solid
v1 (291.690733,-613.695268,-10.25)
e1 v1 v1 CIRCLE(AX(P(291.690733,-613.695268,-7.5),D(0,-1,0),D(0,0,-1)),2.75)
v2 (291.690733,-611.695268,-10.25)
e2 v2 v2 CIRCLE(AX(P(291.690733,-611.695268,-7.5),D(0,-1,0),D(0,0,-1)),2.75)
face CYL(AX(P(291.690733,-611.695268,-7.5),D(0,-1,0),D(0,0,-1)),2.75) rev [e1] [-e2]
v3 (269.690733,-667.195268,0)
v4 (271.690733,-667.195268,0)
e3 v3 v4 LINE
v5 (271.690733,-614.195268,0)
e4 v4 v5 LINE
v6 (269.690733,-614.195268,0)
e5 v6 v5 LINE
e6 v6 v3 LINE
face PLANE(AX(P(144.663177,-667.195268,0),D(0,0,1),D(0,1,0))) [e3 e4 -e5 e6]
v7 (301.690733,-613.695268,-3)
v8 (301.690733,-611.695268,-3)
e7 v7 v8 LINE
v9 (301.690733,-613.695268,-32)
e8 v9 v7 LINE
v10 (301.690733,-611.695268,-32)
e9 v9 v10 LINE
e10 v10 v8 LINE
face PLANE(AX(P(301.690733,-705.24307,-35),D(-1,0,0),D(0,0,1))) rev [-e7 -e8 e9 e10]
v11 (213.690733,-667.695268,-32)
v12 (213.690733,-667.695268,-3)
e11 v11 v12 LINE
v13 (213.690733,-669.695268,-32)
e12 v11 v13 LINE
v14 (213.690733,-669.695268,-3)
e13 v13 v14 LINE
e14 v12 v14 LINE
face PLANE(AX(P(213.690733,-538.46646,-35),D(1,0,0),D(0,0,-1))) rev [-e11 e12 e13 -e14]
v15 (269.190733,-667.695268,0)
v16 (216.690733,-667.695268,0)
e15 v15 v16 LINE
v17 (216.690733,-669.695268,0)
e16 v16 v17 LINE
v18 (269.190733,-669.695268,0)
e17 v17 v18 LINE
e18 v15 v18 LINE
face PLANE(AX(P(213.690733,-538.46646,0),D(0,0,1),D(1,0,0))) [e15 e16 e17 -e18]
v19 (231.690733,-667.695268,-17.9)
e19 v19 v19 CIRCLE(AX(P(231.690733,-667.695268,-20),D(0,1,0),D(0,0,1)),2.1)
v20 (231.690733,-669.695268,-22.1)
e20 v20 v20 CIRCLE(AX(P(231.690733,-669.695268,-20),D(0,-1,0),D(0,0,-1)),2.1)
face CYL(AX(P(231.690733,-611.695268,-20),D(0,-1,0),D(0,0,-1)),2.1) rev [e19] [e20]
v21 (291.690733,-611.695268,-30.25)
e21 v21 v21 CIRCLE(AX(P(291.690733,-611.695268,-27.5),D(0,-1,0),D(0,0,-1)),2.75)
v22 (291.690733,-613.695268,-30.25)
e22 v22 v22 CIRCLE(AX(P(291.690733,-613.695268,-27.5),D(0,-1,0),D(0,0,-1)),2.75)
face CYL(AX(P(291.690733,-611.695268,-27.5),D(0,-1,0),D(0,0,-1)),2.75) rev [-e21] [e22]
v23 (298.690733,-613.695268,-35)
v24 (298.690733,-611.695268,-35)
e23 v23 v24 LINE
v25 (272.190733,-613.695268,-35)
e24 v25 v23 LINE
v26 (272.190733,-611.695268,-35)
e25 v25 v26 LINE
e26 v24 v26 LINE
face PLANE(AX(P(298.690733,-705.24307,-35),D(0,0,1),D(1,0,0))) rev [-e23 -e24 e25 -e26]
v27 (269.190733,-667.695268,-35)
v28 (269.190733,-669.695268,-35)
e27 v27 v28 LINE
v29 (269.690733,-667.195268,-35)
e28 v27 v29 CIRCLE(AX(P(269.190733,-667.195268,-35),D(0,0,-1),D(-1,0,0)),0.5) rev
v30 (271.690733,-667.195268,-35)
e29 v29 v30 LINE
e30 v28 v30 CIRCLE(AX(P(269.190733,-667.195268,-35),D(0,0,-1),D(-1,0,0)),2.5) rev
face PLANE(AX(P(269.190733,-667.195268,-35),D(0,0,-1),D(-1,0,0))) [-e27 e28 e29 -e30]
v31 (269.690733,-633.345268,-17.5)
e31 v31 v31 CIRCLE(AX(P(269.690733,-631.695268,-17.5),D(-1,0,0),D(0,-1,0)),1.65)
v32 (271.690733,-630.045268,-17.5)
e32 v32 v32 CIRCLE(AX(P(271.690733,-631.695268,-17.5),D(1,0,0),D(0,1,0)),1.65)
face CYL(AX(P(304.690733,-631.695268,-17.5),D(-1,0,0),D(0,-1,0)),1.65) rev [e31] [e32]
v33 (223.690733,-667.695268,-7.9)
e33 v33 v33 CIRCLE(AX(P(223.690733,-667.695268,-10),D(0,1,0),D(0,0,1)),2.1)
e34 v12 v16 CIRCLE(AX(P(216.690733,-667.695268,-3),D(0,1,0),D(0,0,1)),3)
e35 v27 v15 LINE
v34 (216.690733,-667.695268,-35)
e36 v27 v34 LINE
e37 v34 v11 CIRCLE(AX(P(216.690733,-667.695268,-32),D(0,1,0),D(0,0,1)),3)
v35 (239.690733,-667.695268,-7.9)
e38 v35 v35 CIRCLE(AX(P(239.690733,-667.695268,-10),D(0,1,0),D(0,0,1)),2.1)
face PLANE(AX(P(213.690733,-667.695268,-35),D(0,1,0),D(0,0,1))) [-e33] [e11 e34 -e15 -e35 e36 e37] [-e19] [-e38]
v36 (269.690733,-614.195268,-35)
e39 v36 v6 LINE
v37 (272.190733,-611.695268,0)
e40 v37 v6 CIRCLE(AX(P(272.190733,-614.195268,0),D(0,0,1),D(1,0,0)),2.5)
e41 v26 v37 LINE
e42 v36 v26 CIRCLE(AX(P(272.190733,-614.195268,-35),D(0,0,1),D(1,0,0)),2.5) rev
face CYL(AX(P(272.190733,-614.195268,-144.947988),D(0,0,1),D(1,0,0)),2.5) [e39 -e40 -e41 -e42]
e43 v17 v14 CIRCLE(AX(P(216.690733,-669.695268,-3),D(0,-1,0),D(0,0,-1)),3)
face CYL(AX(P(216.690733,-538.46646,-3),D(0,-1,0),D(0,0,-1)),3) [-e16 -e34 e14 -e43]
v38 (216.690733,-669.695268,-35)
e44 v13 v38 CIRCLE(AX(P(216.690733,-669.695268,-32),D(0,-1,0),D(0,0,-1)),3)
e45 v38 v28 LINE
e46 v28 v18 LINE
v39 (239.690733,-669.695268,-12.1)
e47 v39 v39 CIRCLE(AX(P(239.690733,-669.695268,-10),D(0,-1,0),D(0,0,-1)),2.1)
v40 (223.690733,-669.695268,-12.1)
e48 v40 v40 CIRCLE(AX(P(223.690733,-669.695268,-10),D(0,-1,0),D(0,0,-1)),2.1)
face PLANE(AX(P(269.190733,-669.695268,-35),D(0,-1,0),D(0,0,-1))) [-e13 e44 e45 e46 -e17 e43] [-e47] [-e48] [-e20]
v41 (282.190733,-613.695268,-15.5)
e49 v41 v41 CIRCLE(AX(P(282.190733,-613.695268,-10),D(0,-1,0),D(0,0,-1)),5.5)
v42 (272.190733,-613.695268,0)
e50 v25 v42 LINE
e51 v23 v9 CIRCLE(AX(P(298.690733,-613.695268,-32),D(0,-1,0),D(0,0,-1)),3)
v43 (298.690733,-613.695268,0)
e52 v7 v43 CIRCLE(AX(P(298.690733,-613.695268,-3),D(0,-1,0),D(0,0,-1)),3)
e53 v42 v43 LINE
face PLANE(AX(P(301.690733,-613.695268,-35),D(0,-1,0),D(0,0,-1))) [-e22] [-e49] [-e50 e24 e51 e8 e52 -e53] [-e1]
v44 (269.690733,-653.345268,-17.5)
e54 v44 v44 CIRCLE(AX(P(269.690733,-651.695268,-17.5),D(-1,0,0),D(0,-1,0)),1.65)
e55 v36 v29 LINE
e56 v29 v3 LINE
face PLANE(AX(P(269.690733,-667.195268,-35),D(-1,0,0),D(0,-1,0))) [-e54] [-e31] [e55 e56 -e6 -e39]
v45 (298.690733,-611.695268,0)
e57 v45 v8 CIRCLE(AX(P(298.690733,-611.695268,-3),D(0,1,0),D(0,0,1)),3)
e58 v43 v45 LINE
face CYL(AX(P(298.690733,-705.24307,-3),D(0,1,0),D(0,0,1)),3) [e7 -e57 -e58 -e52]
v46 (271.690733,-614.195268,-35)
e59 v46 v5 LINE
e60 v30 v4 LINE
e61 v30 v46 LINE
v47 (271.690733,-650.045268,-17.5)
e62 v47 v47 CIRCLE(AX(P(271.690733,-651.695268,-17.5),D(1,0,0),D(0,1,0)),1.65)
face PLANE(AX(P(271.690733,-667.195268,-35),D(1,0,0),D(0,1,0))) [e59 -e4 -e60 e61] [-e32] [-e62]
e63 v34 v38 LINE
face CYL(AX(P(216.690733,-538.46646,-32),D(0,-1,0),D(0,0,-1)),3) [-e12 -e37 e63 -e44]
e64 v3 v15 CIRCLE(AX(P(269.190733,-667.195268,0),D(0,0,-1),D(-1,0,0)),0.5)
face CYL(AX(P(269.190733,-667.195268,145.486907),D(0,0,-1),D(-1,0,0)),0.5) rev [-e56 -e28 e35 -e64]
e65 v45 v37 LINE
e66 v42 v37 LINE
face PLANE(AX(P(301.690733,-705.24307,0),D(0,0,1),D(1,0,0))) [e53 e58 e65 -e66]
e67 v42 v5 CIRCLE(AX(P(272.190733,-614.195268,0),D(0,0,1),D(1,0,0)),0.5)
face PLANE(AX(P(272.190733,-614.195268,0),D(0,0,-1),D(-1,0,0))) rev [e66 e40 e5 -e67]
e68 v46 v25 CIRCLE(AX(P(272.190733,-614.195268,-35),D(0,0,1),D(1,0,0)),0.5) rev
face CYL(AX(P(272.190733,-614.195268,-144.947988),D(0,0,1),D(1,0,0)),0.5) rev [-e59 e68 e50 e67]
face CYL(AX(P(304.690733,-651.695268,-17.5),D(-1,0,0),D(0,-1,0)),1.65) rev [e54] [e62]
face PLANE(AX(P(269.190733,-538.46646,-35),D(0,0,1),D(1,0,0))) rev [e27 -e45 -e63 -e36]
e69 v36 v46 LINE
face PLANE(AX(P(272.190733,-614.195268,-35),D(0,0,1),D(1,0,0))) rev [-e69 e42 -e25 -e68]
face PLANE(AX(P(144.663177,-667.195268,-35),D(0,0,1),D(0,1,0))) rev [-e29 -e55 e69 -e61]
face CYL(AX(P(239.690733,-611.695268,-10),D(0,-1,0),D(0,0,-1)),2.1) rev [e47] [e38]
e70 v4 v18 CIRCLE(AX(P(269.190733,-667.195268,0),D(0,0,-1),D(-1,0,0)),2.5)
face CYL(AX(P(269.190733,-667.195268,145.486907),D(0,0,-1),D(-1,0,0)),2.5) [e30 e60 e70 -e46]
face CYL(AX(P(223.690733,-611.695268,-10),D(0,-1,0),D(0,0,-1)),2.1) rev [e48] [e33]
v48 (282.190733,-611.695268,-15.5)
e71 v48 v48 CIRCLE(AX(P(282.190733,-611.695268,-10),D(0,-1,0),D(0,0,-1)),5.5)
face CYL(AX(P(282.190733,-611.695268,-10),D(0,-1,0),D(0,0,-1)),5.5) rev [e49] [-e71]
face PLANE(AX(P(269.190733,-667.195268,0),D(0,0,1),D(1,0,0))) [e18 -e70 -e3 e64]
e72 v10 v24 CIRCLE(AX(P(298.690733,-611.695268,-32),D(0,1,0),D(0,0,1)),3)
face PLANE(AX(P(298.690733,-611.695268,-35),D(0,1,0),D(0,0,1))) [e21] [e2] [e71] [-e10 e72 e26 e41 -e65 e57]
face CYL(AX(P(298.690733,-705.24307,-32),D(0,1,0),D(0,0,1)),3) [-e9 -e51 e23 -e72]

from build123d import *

# Parameters (mm, degrees)
EXTRUDE_1_DEPTH               = 35
FILLET_1_R                    = 3
CUT_EXTRUDE_2_DEPTH           = 310.2026821
CUT_EXTRUDE_2_DEPTH_BACK      = 310.2026821
SKETCH_5_R                    = 2.1
SKETCH_5_R_2                  = 5.5
SKETCH_5_R_3                  = 2.75
SKETCH_6_R                    = 1.65
CUT_EXTRUDE_3_DEPTH           = 35
SHEET_START                   = -667.695268107
SHEET_METAL_1_OUTLINE_R       = 2.75
SHEET_METAL_1_OUTLINE_R_2     = 5.5
SHEET_METAL_1_DEPTH           = 56
SHEET_START_2                 = -669.695268107
SHEET_METAL_1_2_OUTLINE_R     = 1.65
SHEET_METAL_1_2_OUTLINE_R_2   = 2.75
SHEET_METAL_1_2_OUTLINE_R_3   = 5.5
SHEET_METAL_1_2_DEPTH         = 2
SHEET_METAL_1_3_OUTLINE_R     = 1.65
SHEET_METAL_1_3_OUTLINE_R_2   = 2.75
SHEET_METAL_1_3_OUTLINE_R_3   = 5.5
SHEET_METAL_1_3_DEPTH         = 2
SHEET_START_3                 = -650.045268007
SHEET_METAL_1_3_2_OUTLINE_W   = 2
SHEET_METAL_1_3_2_OUTLINE_H   = 35
SHEET_METAL_1_3_2_DEPTH       = 16.6999998
SHEET_START_4                 = -630.045268007
SHEET_METAL_1_3_3_OUTLINE_W   = 2
SHEET_METAL_1_3_3_OUTLINE_H   = 35
SHEET_METAL_1_3_3_DEPTH       = 15.8499999
SHEET_START_5                 = -667.459318107
SHEET_METAL_1_3_4_OUTLINE_W   = 2
SHEET_METAL_1_3_4_OUTLINE_H   = 35
SHEET_METAL_1_3_4_DEPTH       = 14.1140499
SHEET_START_6                 = -613.695268107
SHEET_METAL_1_3_5_OUTLINE_R   = 1.65
SHEET_METAL_1_3_5_DEPTH       = 2
SHEET_START_7                 = -614.195268107
SHEET_METAL_1_3_6_OUTLINE_R   = 5.5
SHEET_METAL_1_3_6_OUTLINE_R_2 = 2.75
SHEET_METAL_1_3_6_OUTLINE_R_3 = 1.65
SHEET_METAL_1_3_6_DEPTH       = 2.5
SHEET_START_8                 = -653.345268207
SHEET_METAL_1_3_7_OUTLINE_W   = 2
SHEET_METAL_1_3_7_OUTLINE_H   = 35
SHEET_METAL_1_3_7_DEPTH       = 23.3000002
SHEET_METAL_1_3_8_OUTLINE_W   = 2
SHEET_METAL_1_3_8_OUTLINE_H   = 35
SHEET_METAL_1_3_8_DEPTH       = 0.23595
SHEET_START_9                 = -35
SHEET_METAL_1_3_9_DEPTH       = 35
SHEET_START_10                = 269.690733397
SHEET_METAL_1_3_10_OUTLINE_R  = 1.65
SHEET_METAL_1_3_10_DEPTH      = 2
SHEET_METAL_1_3_11_DEPTH      = 35


with BuildPart() as part:
    # Sketch 2 → 凸台-拉伸1 (new body)
    with BuildSketch(Plane.XY):
        with BuildLine():
            Line((298.690733397, -611.695268107), (272.190733397, -611.695268107))
            ThreePointArc((272.190733397, -611.695268107), (270.422966444, -612.427501154), (269.690733397, -614.195268107))
            Line((269.690733397, -614.195268107), (269.690733397, -667.195268107))
            ThreePointArc((269.690733397, -667.195268107), (269.544286788, -667.548821498), (269.190733397, -667.695268107))
            Line((269.190733397, -667.695268107), (216.690733397, -667.695268107))
            Line((216.690733397, -667.695268107), (213.690733397, -667.695268107))
            Line((213.690733397, -667.695268107), (213.690733397, -669.695268107))
            Line((213.690733397, -669.695268107), (216.690733397, -669.695268107))
            Line((216.690733397, -669.695268107), (269.190733397, -669.695268107))
            ThreePointArc((269.190733397, -669.695268107), (270.95850035, -668.96303506), (271.690733397, -667.195268107))
            Line((271.690733397, -667.195268107), (271.690733397, -614.195268107))
            ThreePointArc((271.690733397, -614.195268107), (271.837180006, -613.841714717), (272.190733397, -613.695268107))
            Line((272.190733397, -613.695268107), (298.690733397, -613.695268107))
            Line((298.690733397, -613.695268107), (301.690733397, -613.695268107))
            Line((301.690733397, -613.695268107), (301.690733397, -611.695268107))
            Line((301.690733397, -611.695268107), (298.690733397, -611.695268107))
        make_face()
    extrude(amount=-EXTRUDE_1_DEPTH)

    # 圆角1
    fillet_1_edges = [part.edges().sort_by_distance(p)[0] for p in [
        (301.690733397, -612.695268107, -35),
        (213.690733397, -668.695268107, 0),
        (301.690733397, -612.695268107, 0),
        (213.690733397, -668.695268107, -35),
    ]]
    fillet(fillet_1_edges, radius=FILLET_1_R)

    # 草图5 → 切除-拉伸2 (cut, two sides: drawn at the far end of the back side and taken through both)
    with BuildSketch(Plane.XZ.offset(669.695268107).offset(-CUT_EXTRUDE_2_DEPTH_BACK)):
        with Locations(Location((223.690733397, -10, 0), (0, 0, 270))):
            Circle(SKETCH_5_R)
        with Locations(Location((239.690733397, -10, 0), (0, 0, 270))):
            Circle(SKETCH_5_R)
        with Locations(Location((231.690733397, -20, 0), (0, 0, 270))):
            Circle(SKETCH_5_R)
        with Locations(Location((282.190733397, -10, 0), (0, 0, 270))):
            Circle(SKETCH_5_R_2)
        with Locations(Location((291.690733397, -7.5, 0), (0, 0, 270))):
            Circle(SKETCH_5_R_3)
        with Locations(Location((291.690733397, -27.5, 0), (0, 0, 270))):
            Circle(SKETCH_5_R_3)
    extrude(amount=CUT_EXTRUDE_2_DEPTH + CUT_EXTRUDE_2_DEPTH_BACK, mode=Mode.SUBTRACT)

    # 草图6 → 切除-拉伸3 (cut)
    with BuildSketch(Plane.ZY.offset(-269.690733397)):
        with Locations(Location((-17.5, -651.695268107, 0), (0, 0, 270))):
            Circle(SKETCH_6_R)
        with Locations(Location((-17.5, -631.695268107, 0), (0, 0, 270))):
            Circle(SKETCH_6_R)
    extrude(amount=-CUT_EXTRUDE_3_DEPTH, mode=Mode.SUBTRACT)

    # Sheet Metal 1: read off the stored shape, not the designer's step
    # Sheet Metal 1 outline → Sheet Metal 1 (cut)
    with BuildSketch(Plane(origin=(0, 0, 0), x_dir=(1, 0, 0), z_dir=(0, 1, 0)).offset(SHEET_START)):
        with BuildLine():
            ThreePointArc((298.690733397, 0), (300.812053741, 0.878679656), (301.690733397, 3))
            Line((301.690733397, 3), (301.690733397, 32))
            ThreePointArc((301.690733397, 32), (300.812053741, 34.121320344), (298.690733397, 35))
            Line((298.690733397, 35), (269.190733397, 35))
            Line((269.190733397, 35), (269.190733397, 0))
            Line((269.190733397, 0), (298.690733397, 0))
        make_face()
        with Locations((291.690733397, 7.5)):
            Circle(SHEET_METAL_1_OUTLINE_R, mode=Mode.SUBTRACT)
        with Locations((282.190733397, 10)):
            Circle(SHEET_METAL_1_OUTLINE_R_2, mode=Mode.SUBTRACT)
        with Locations((291.690733397, 27.5)):
            Circle(SHEET_METAL_1_OUTLINE_R, mode=Mode.SUBTRACT)
    extrude(amount=SHEET_METAL_1_DEPTH, mode=Mode.SUBTRACT)

    # Sheet Metal 1 2 outline → Sheet Metal 1 2 (add)
    with BuildSketch(Plane(origin=(0, 0, 0), x_dir=(1, 0, 0), z_dir=(0, 1, 0)).offset(SHEET_START_2)):
        with BuildLine():
            ThreePointArc((351.890733397, 0), (354.012053741, 0.878679656), (354.890733397, 3))
            Line((354.890733397, 3), (354.890733397, 32))
            ThreePointArc((354.890733397, 32), (354.012053741, 34.121320344), (351.890733397, 35))
            Line((351.890733397, 35), (269.190733397, 35))
            Line((269.190733397, 35), (269.190733397, 0))
            Line((269.190733397, 0), (351.890733397, 0))
        make_face()
        with Locations((306.290733397, 17.5)):
            Circle(SHEET_METAL_1_2_OUTLINE_R, mode=Mode.SUBTRACT)
        with Locations((286.290733397, 17.5)):
            Circle(SHEET_METAL_1_2_OUTLINE_R, mode=Mode.SUBTRACT)
        with Locations((344.890733397, 27.5)):
            Circle(SHEET_METAL_1_2_OUTLINE_R_2, mode=Mode.SUBTRACT)
        with Locations((344.890733397, 7.5)):
            Circle(SHEET_METAL_1_2_OUTLINE_R_2, mode=Mode.SUBTRACT)
        with Locations((335.390733397, 10)):
            Circle(SHEET_METAL_1_2_OUTLINE_R_3, mode=Mode.SUBTRACT)
    extrude(amount=SHEET_METAL_1_2_DEPTH)

    # Sheet Metal 1 3: read off the stored shape, not the designer's step
    # Sheet Metal 1 3 outline → Sheet Metal 1 3 (cut)
    with BuildSketch(Plane(origin=(0, 0, 0), x_dir=(1, 0, 0), z_dir=(0, 1, 0)).offset(SHEET_START_2)):
        with BuildLine():
            ThreePointArc((351.890733397, 0), (354.012053741, 0.878679656), (354.890733397, 3))
            Line((354.890733397, 3), (354.890733397, 32))
            ThreePointArc((354.890733397, 32), (354.012053741, 34.121320344), (351.890733397, 35))
            Line((351.890733397, 35), (271.690733397, 35))
            Line((271.690733397, 35), (271.690733397, 0))
            Line((271.690733397, 0), (351.890733397, 0))
        make_face()
        with Locations((286.290733397, 17.5)):
            Circle(SHEET_METAL_1_3_OUTLINE_R, mode=Mode.SUBTRACT)
        with Locations((344.890733397, 7.5)):
            Circle(SHEET_METAL_1_3_OUTLINE_R_2, mode=Mode.SUBTRACT)
        with Locations((335.390733397, 10)):
            Circle(SHEET_METAL_1_3_OUTLINE_R_3, mode=Mode.SUBTRACT)
        with Locations((344.890733397, 27.5)):
            Circle(SHEET_METAL_1_3_OUTLINE_R_2, mode=Mode.SUBTRACT)
        with Locations((306.290733397, 17.5)):
            Circle(SHEET_METAL_1_3_OUTLINE_R, mode=Mode.SUBTRACT)
    extrude(amount=SHEET_METAL_1_3_DEPTH, mode=Mode.SUBTRACT)



with BuildPart() as body_2:
    # Sheet Metal 1 3 2 outline → Sheet Metal 1 3 2 (new body)
    with BuildSketch(Plane(origin=(0, 0, 0), x_dir=(1, 0, 0), z_dir=(0, 1, 0)).offset(SHEET_START_3)):
        with Locations((270.690733397, 17.5)):
            Rectangle(SHEET_METAL_1_3_2_OUTLINE_W, SHEET_METAL_1_3_2_OUTLINE_H)
    extrude(amount=SHEET_METAL_1_3_2_DEPTH)



with BuildPart() as body_3:
    # Sheet Metal 1 3 3 outline → Sheet Metal 1 3 3 (new body)
    with BuildSketch(Plane(origin=(0, 0, 0), x_dir=(1, 0, 0), z_dir=(0, 1, 0)).offset(SHEET_START_4)):
        with Locations((270.690733397, 17.5)):
            Rectangle(SHEET_METAL_1_3_3_OUTLINE_W, SHEET_METAL_1_3_3_OUTLINE_H)
    extrude(amount=SHEET_METAL_1_3_3_DEPTH)



with BuildPart() as body_4:
    # Sheet Metal 1 3 4 outline → Sheet Metal 1 3 4 (new body)
    with BuildSketch(Plane(origin=(0, 0, 0), x_dir=(1, 0, 0), z_dir=(0, 1, 0)).offset(SHEET_START_5)):
        with Locations((270.690733397, 17.5)):
            Rectangle(SHEET_METAL_1_3_4_OUTLINE_W, SHEET_METAL_1_3_4_OUTLINE_H)
    extrude(amount=SHEET_METAL_1_3_4_DEPTH)


with BuildPart() as body_5:
    # Sheet Metal 1 3 5 outline → Sheet Metal 1 3 5 (new body)
    with BuildSketch(Plane(origin=(0, 0, 0), x_dir=(1, 0, 0), z_dir=(0, 1, 0)).offset(SHEET_START_6)):
        with Locations((286.290733397, 17.5)):
            Circle(SHEET_METAL_1_3_5_OUTLINE_R)
    extrude(amount=SHEET_METAL_1_3_5_DEPTH)


with BuildPart() as body_3_1:
    add(body_3.part)

    add(body_5.part)  # Sheet Metal 1 3 6 merges body 5
    # Sheet Metal 1 3 6 outline → Sheet Metal 1 3 6 (add)
    with BuildSketch(Plane(origin=(0, 0, 0), x_dir=(1, 0, 0), z_dir=(0, 1, 0)).offset(SHEET_START_7)):
        with BuildLine():
            ThreePointArc((298.690733397, 0), (300.812053741, 0.878679656), (301.690733397, 3))
            Line((301.690733397, 3), (301.690733397, 32))
            ThreePointArc((301.690733397, 32), (300.812053741, 34.121320344), (298.690733397, 35))
            Line((298.690733397, 35), (269.690733397, 35))
            Line((269.690733397, 35), (269.690733397, 0))
            Line((269.690733397, 0), (298.690733397, 0))
        make_face()
        with Locations((282.190733397, 10)):
            Circle(SHEET_METAL_1_3_6_OUTLINE_R, mode=Mode.SUBTRACT)
        with Locations((291.690733397, 7.5)):
            Circle(SHEET_METAL_1_3_6_OUTLINE_R_2, mode=Mode.SUBTRACT)
        with Locations((286.290733397, 17.5)):
            Circle(SHEET_METAL_1_3_6_OUTLINE_R_3, mode=Mode.SUBTRACT)
        with Locations((291.690733397, 27.5)):
            Circle(SHEET_METAL_1_3_6_OUTLINE_R_2, mode=Mode.SUBTRACT)
    extrude(amount=SHEET_METAL_1_3_6_DEPTH)


with BuildPart() as body_2_1:
    add(body_2.part)

    add(body_3_1.part)  # Sheet Metal 1 3 7 merges body 3

    add(body_4.part)  # Sheet Metal 1 3 7 merges body 4
    # Sheet Metal 1 3 7 outline → Sheet Metal 1 3 7 (add)
    with BuildSketch(Plane(origin=(0, 0, 0), x_dir=(1, 0, 0), z_dir=(0, 1, 0)).offset(SHEET_START_8)):
        with Locations((270.690733397, 17.5)):
            Rectangle(SHEET_METAL_1_3_7_OUTLINE_W, SHEET_METAL_1_3_7_OUTLINE_H)
    extrude(amount=SHEET_METAL_1_3_7_DEPTH)


with BuildPart() as part_1:
    add(part.part)

    add(body_2_1.part)  # Sheet Metal 1 3 8 merges body 2
    # Sheet Metal 1 3 8 outline → Sheet Metal 1 3 8 (add)
    with BuildSketch(Plane(origin=(0, 0, 0), x_dir=(1, 0, 0), z_dir=(0, 1, 0)).offset(SHEET_START)):
        with Locations((270.690733397, 17.5)):
            Rectangle(SHEET_METAL_1_3_8_OUTLINE_W, SHEET_METAL_1_3_8_OUTLINE_H)
    extrude(amount=SHEET_METAL_1_3_8_DEPTH)

    # Sheet Metal 1 3 9 outline → Sheet Metal 1 3 9 (add)
    with BuildSketch(Plane.XY.offset(SHEET_START_9)):
        with BuildLine():
            Line((269.690733397, -667.695268107), (269.690733397, -667.195268107))
            ThreePointArc((269.690733397, -667.195268107), (269.544286788, -667.548821498), (269.190733397, -667.695268107))
            Line((269.190733397, -667.695268107), (269.690733397, -667.695268107))
        make_face()
    extrude(amount=SHEET_METAL_1_3_9_DEPTH)

    # Sheet Metal 1 3 10 outline → Sheet Metal 1 3 10 (cut)
    with BuildSketch(Plane.YZ.offset(SHEET_START_10)):
        with Locations((-631.695268107, -17.5)):
            Circle(SHEET_METAL_1_3_10_OUTLINE_R)
        with Locations((-651.695268107, -17.5)):
            Circle(SHEET_METAL_1_3_10_OUTLINE_R)
    extrude(amount=SHEET_METAL_1_3_10_DEPTH, mode=Mode.SUBTRACT)

    # Sheet Metal 1 3 11 outline → Sheet Metal 1 3 11 (cut)
    with BuildSketch(Plane.XY.offset(SHEET_START_9)):
        with BuildLine():
            Line((271.690733397, -669.695268107), (271.690733397, -667.195268107))
            ThreePointArc((271.690733397, -667.195268107), (270.95850035, -668.96303506), (269.190733397, -669.695268107))
            Line((269.190733397, -669.695268107), (271.690733397, -669.695268107))
        make_face()
        with BuildLine():
            ThreePointArc((269.690733397, -614.195268107), (270.422966444, -612.427501154), (272.190733397, -611.695268107))
            Line((272.190733397, -611.695268107), (269.690733397, -611.695268107))
            Line((269.690733397, -611.695268107), (269.690733397, -614.195268107))
        make_face()
        with BuildLine():
            ThreePointArc((272.190733397, -613.695268107), (271.837180006, -613.841714716), (271.690733397, -614.195268107))
            Line((271.690733397, -614.195268107), (301.690733397, -614.195268107))
            Line((301.690733397, -614.195268107), (301.690733397, -613.695268107))
            Line((301.690733397, -613.695268107), (272.190733397, -613.695268107))
        make_face()
    extrude(amount=SHEET_METAL_1_3_11_DEPTH, mode=Mode.SUBTRACT)


solid = part_1.part
